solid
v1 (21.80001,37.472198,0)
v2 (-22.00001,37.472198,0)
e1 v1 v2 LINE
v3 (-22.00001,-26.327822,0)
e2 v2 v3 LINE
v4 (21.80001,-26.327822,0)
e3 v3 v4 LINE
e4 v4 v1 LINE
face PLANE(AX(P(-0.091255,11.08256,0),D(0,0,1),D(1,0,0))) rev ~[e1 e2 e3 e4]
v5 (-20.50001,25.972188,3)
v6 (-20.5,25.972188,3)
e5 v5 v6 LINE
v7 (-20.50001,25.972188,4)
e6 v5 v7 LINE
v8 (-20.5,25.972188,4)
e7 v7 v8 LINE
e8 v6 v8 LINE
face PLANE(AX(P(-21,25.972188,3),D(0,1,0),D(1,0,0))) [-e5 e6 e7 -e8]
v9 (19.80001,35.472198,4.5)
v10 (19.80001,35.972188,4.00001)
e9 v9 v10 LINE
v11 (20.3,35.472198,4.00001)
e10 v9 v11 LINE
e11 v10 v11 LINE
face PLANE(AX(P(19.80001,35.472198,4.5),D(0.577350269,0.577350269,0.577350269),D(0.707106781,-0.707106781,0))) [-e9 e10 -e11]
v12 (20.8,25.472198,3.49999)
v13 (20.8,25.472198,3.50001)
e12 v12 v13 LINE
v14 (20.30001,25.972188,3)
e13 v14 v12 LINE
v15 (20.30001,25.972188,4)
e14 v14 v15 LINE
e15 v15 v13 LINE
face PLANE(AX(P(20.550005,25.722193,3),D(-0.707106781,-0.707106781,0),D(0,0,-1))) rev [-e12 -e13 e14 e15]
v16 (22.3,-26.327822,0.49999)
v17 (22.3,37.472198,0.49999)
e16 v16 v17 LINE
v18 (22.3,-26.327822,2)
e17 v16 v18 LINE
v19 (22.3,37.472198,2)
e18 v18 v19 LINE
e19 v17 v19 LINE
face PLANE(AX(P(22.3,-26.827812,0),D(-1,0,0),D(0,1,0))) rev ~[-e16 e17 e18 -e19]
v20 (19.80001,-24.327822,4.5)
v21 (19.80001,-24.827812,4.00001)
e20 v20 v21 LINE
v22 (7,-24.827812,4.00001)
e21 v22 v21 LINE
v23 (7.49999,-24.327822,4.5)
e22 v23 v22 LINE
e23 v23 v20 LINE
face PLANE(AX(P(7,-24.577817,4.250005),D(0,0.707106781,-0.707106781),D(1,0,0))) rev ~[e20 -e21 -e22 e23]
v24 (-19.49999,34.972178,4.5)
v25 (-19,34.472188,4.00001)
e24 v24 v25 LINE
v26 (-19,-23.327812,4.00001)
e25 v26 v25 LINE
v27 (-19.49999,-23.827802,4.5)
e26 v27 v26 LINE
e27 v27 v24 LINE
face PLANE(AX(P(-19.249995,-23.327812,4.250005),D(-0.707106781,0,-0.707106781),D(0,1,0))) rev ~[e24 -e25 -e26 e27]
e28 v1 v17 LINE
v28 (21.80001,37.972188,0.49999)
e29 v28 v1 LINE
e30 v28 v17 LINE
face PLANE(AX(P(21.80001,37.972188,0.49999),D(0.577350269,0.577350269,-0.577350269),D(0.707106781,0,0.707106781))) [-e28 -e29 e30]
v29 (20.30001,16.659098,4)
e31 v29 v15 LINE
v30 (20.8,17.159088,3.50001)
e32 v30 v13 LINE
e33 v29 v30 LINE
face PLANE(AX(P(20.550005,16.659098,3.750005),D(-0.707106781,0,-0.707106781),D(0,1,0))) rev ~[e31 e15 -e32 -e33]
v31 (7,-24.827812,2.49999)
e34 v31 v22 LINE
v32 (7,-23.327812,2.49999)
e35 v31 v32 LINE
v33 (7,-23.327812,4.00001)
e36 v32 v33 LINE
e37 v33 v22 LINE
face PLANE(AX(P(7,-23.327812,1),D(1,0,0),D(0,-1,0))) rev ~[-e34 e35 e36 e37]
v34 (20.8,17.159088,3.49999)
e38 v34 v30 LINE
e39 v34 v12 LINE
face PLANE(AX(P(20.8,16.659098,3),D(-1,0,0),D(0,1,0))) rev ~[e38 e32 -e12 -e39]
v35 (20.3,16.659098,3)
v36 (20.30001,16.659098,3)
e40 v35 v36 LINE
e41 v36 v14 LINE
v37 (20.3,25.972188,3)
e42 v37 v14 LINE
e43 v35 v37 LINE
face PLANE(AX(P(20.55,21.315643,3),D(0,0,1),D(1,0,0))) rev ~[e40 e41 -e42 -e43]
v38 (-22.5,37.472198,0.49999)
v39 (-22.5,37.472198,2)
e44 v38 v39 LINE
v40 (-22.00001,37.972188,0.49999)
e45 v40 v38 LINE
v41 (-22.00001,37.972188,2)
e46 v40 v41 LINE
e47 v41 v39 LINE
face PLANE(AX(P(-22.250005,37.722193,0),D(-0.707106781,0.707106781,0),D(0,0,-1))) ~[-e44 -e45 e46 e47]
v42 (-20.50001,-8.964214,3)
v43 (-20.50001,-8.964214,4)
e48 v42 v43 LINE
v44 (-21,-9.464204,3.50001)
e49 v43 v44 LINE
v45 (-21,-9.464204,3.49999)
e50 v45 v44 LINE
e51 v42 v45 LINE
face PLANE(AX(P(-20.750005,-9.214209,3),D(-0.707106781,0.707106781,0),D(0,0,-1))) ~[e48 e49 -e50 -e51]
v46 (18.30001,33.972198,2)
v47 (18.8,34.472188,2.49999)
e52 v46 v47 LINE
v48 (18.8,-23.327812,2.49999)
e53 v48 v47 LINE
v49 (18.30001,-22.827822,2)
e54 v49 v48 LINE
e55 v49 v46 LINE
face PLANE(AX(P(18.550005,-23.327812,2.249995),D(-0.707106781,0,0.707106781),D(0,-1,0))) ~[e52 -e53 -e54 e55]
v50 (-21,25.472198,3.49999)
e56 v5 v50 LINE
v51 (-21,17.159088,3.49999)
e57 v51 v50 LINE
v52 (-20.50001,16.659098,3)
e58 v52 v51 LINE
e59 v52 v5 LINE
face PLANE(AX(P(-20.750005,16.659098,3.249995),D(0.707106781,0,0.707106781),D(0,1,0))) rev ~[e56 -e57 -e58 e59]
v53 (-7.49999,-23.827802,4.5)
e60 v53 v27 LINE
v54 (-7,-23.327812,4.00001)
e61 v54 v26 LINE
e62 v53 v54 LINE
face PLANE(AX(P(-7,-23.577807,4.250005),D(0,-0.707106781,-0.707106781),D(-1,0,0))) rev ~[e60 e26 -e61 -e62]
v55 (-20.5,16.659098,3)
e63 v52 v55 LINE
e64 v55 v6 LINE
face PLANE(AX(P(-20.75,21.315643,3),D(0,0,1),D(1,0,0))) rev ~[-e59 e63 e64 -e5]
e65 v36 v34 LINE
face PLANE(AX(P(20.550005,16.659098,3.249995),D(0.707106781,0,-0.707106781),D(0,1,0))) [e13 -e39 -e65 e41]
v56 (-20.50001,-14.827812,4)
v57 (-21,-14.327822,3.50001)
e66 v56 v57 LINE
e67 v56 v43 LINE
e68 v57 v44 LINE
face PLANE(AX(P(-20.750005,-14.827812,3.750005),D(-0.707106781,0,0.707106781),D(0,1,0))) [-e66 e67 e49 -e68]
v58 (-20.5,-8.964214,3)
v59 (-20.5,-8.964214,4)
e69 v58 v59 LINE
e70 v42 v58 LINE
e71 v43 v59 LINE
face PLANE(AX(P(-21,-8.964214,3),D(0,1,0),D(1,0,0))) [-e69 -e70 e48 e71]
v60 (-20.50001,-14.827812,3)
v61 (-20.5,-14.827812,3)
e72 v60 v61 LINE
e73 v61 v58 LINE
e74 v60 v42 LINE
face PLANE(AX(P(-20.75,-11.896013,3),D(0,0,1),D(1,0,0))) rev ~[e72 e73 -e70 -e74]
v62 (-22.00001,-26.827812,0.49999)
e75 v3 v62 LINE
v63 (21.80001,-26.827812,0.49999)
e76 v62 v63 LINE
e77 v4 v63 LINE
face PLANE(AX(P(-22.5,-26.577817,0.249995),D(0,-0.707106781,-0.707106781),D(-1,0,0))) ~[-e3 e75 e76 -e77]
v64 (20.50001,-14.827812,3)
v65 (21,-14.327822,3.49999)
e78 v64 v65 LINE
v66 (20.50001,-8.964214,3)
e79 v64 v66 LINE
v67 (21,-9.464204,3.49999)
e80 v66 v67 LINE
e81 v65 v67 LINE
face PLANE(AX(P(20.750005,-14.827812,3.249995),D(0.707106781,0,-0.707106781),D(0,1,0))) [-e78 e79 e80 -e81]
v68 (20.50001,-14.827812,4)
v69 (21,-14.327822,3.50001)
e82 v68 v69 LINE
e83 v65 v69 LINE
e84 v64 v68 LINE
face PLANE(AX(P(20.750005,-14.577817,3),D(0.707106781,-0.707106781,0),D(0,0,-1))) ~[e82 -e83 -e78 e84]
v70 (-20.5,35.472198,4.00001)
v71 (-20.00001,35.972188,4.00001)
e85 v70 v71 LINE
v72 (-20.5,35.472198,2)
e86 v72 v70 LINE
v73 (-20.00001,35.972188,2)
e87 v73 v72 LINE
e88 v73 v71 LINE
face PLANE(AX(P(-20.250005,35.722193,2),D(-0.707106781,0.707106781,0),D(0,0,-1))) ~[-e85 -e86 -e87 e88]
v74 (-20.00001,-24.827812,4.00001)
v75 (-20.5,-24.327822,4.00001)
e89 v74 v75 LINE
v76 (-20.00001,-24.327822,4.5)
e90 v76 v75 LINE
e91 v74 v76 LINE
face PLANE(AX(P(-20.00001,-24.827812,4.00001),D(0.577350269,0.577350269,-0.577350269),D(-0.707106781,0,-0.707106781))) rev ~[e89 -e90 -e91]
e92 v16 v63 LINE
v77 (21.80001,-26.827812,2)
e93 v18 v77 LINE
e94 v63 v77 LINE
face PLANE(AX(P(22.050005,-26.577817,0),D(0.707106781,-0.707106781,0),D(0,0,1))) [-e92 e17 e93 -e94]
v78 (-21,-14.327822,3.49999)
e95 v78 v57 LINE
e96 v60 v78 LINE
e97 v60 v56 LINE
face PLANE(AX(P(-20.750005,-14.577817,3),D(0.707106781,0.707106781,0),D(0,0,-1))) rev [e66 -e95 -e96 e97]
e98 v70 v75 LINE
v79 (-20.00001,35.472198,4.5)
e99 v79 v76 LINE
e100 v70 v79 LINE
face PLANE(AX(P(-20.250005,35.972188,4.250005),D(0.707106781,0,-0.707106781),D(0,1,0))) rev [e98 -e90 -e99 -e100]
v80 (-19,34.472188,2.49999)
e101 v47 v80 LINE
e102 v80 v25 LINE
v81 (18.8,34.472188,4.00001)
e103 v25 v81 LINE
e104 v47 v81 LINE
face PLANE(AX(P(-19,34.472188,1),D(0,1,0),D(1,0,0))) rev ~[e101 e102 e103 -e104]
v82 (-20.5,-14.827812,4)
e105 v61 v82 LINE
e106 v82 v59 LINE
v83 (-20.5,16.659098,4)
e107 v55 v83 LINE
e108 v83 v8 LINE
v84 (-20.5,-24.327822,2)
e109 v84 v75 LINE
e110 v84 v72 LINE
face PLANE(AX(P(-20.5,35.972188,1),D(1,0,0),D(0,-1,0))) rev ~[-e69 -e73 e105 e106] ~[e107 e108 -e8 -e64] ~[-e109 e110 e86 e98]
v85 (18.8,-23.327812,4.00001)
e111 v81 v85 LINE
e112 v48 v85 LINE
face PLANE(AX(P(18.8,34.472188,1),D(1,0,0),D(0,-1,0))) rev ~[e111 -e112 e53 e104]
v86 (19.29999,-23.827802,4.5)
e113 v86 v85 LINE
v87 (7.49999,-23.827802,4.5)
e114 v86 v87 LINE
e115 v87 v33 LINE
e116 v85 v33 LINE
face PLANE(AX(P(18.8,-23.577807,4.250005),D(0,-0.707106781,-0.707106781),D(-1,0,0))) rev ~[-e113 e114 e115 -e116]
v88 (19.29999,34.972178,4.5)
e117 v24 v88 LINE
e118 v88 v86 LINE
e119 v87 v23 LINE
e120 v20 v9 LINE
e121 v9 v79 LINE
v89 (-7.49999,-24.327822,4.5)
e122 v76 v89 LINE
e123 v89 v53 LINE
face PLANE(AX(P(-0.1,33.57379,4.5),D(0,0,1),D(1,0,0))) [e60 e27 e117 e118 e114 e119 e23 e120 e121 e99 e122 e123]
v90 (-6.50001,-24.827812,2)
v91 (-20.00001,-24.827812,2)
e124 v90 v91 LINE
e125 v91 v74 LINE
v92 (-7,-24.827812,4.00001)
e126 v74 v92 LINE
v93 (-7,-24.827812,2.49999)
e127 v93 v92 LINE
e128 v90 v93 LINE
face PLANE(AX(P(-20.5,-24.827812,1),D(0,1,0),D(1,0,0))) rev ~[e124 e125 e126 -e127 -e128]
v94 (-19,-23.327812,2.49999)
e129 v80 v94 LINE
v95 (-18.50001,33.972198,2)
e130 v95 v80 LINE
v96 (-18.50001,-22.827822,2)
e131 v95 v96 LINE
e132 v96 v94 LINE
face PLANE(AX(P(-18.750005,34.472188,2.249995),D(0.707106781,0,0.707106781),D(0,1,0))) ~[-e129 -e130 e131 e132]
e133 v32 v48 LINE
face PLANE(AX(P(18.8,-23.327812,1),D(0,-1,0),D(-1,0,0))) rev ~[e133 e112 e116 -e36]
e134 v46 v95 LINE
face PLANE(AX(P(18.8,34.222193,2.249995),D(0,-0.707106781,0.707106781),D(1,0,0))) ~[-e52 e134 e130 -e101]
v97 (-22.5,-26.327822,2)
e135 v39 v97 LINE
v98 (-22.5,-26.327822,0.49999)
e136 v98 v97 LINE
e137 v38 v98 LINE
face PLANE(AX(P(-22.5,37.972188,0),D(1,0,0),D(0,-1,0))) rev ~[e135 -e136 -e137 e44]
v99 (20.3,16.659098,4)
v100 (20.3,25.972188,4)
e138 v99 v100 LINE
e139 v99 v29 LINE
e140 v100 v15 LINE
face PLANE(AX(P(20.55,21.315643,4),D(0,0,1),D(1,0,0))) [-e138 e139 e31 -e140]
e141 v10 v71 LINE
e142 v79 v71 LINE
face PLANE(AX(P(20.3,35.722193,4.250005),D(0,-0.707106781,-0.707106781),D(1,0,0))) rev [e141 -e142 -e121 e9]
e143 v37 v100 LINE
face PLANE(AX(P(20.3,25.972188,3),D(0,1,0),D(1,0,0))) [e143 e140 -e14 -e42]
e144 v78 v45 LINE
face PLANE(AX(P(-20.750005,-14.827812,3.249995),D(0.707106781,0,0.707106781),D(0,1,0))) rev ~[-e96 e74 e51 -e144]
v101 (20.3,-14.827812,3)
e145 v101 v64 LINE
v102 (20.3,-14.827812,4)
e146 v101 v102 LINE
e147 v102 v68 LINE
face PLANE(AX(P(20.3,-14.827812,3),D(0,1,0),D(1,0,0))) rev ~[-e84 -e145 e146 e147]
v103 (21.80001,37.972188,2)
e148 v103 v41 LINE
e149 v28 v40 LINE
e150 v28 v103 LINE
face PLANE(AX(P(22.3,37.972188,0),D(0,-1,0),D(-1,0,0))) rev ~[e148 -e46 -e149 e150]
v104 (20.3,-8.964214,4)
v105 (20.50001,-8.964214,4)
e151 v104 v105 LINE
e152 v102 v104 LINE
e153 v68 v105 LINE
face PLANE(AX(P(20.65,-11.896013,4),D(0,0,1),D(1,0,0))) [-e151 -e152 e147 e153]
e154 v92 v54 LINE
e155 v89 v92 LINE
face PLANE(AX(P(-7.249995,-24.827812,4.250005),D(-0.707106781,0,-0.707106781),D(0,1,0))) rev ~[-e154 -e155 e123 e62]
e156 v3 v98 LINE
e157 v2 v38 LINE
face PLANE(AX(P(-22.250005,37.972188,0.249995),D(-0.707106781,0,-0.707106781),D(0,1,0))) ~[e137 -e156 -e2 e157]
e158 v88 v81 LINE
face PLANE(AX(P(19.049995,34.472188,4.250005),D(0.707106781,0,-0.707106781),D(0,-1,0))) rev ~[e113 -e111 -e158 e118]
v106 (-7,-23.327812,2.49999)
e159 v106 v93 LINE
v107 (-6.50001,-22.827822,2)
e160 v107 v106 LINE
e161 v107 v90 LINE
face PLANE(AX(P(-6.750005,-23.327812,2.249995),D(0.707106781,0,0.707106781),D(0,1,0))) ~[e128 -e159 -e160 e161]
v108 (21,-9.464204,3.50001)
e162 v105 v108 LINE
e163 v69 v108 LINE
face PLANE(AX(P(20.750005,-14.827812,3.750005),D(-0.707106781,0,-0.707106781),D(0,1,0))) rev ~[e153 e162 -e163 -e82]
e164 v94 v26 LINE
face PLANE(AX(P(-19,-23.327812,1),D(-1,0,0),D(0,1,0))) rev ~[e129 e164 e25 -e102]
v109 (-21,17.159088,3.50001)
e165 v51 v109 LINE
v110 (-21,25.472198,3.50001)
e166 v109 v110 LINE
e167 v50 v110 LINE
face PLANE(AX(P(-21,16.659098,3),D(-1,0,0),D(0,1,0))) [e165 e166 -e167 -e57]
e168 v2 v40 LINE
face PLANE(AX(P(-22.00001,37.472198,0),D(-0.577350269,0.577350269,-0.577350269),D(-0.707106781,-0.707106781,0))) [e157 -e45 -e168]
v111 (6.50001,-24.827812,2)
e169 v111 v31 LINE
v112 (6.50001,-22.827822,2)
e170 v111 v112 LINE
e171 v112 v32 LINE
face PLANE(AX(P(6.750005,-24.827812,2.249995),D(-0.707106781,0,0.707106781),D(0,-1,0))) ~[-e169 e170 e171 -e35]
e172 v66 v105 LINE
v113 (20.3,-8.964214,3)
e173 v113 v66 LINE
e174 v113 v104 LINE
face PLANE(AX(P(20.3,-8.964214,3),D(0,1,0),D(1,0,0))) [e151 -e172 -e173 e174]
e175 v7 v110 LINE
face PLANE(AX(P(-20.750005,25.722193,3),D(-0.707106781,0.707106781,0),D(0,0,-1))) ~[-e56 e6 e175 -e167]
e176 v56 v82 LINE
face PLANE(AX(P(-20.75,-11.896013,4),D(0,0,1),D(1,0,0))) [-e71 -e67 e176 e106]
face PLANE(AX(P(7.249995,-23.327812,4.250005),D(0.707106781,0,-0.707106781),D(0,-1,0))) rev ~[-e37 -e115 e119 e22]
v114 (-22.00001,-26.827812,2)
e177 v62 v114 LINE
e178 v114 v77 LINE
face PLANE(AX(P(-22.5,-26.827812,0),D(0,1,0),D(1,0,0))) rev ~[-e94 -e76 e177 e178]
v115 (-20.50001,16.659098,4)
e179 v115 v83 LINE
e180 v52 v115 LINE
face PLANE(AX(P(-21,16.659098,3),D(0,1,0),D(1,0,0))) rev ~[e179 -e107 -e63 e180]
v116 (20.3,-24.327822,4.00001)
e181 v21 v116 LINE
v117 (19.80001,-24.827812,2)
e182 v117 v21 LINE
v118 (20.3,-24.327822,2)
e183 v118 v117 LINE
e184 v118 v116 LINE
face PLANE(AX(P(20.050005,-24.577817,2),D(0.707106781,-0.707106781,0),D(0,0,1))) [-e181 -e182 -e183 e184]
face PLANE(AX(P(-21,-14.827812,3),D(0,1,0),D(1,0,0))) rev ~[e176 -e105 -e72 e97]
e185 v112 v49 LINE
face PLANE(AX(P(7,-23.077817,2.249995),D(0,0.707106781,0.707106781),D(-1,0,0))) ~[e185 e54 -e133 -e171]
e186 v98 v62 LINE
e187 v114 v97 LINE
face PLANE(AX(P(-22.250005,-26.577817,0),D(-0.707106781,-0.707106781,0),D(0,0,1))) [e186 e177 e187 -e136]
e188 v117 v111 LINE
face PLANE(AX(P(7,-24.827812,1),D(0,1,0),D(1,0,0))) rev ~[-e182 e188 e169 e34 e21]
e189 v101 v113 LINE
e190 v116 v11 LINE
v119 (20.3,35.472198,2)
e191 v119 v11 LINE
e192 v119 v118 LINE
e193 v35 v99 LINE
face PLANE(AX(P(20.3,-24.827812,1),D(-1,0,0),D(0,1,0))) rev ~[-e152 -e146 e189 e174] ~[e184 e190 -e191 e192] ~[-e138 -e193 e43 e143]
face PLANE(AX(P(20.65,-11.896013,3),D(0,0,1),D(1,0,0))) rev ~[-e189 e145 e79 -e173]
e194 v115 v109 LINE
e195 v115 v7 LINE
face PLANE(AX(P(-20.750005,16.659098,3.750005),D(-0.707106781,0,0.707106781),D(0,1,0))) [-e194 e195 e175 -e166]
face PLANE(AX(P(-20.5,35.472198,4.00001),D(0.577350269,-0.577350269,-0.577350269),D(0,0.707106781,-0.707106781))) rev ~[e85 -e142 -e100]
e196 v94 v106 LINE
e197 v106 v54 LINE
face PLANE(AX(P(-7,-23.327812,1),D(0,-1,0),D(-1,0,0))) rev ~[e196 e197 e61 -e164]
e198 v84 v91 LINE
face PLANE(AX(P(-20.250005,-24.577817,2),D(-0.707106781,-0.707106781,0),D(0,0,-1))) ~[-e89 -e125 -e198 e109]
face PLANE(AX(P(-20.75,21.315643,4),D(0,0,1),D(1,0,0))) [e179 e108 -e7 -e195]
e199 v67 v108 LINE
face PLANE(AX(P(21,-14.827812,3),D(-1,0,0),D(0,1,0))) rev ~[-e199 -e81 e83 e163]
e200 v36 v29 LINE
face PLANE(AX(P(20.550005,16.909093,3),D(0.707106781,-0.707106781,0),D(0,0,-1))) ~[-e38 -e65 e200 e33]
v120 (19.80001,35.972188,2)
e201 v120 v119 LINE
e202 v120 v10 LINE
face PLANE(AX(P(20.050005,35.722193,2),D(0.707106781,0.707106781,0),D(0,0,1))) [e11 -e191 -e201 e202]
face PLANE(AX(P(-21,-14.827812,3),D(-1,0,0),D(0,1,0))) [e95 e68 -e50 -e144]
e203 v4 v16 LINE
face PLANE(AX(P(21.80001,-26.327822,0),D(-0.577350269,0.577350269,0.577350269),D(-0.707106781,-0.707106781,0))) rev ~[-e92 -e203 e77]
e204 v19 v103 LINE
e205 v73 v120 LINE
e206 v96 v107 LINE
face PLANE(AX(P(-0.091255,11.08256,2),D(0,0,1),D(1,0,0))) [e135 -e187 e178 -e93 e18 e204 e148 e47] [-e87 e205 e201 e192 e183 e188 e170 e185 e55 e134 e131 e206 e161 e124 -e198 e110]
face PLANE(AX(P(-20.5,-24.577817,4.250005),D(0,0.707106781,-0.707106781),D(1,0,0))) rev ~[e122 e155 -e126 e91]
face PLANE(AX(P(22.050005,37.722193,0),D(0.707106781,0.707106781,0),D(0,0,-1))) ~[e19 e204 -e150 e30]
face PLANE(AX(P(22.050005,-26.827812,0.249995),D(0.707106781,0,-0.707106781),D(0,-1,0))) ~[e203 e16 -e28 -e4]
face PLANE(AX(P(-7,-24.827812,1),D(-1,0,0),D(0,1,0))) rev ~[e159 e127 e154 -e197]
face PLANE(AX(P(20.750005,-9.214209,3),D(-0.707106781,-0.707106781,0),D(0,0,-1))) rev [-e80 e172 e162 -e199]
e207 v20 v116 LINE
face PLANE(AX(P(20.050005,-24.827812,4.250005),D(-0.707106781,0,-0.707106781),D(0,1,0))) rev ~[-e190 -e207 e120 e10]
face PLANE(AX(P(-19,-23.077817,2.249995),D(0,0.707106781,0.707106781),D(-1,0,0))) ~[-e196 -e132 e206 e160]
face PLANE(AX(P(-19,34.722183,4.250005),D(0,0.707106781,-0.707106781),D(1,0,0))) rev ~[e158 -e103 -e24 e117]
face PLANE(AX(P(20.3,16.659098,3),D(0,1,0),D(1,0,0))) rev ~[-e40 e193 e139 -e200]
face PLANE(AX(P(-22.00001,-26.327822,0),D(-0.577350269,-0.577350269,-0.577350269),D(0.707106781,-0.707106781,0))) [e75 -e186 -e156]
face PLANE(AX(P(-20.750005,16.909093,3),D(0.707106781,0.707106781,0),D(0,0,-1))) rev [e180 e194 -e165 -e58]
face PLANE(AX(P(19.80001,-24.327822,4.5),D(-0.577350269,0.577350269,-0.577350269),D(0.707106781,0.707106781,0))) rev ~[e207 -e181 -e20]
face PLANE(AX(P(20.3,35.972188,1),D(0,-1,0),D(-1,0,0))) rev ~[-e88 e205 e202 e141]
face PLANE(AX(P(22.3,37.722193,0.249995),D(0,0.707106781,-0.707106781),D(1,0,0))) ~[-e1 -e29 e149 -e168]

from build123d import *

# Parameters (mm, degrees)
F0_W     = 1.5
F0_H     = 9.3130898729
F0_H_2   = 25.6233112887
F0_H_3   = 5.8635988384
F0_W_2   = 14
F0_H_4   = 2
F0_H_5   = 0.4158456028
F0_W_3   = 0.7
F0_W_4   = 0.5
F0_W_5   = 37.8
F0_H_6   = 8.5
F0_W_6   = 10
F0_H_7   = 1.5
F1_DEPTH = 2
F2_START = 1
F2_DEPTH = 3.5
F3_START = 3
F3_DEPTH = 1
F4_SIZE  = 0.49999


# Not quite as in the source:
# - a fillet or chamfer is up to 0.001 mm smaller than in the source, because OpenCascade refuses the exact size
# - a feature names something its author has since deleted; it is built from what else it names


with BuildPart() as f1:
    # F0 (on Top) → F1 (new body)
    with BuildSketch(Plane.XY):
        Polygon((-20.5, 25.9721875068), (-20.5, 35.9721875068), (20.3, 35.9721875068), (20.3, 25.9721875068), (20.8, 25.9721875068), (20.8, 16.6590976339), (20.3, 16.6590976339), (20.3, -8.9642136547), (21, -8.9642136547), (21, -14.8278124932), (20.3, -14.8278124932), (20.3, -24.8278124932), (17, -24.8278124932), (17, -26.8278124932), (22.3, -26.8278124932), (22.3, -13.9410611472), (22.3, 25.0854361609), (22.3, 37.9721875068), (-22.5, 37.9721875068), (-22.5, 25.0854361609), (-22.5, -13.9410611472), (-22.5, -26.8278124932), (-17, -26.8278124932), (-17, -24.8278124932), (-20.5, -24.8278124932), (-20.5, -14.8278124932), (-21, -14.8278124932), (-21, -8.9642136547), (-20.5, -8.9642136547), (-20.5, 16.6590976339), (-21, 16.6590976339), (-21, 25.9721875068), align=None)
        Polygon((20.3, 35.9721875068), (-20.5, 35.9721875068), (-20.5, 25.9721875068), (-19, 25.9721875068), (-19, 34.4721875068), (18.8, 34.4721875068), (18.8, 25.9721875068), (20.3, 25.9721875068), align=None)
        with Locations((-19.75, 21.3156425704)):
            Rectangle(F0_W, F0_H)
        with Locations((-19.75, 3.8474419896)):
            Rectangle(F0_W, F0_H_2)
        Polygon((18.8, -14.8278124932), (-19, -14.8278124932), (-19, -23.3278124932), (-7, -23.3278124932), (-7, -22.9119668904), (7, -22.9119668904), (7, -23.3278124932), (18.8, -23.3278124932), align=None)
        with Locations((-19.75, -11.8960130739)):
            Rectangle(F0_W, F0_H_3)
        with Locations((0, -25.8278124932)):
            Rectangle(F0_W_2, F0_H_4)
        with Locations((0, -23.1198896918)):
            Rectangle(F0_W_2, F0_H_5)
        Polygon((-19, -14.8278124932), (-20.5, -14.8278124932), (-20.5, -24.8278124932), (-17, -24.8278124932), (-7, -24.8278124932), (-7, -23.3278124932), (-19, -23.3278124932), align=None)
        with Locations((20.65, -11.8960130739)):
            Rectangle(F0_W_3, F0_H_3)
        with Locations((-20.75, -11.8960130739)):
            Rectangle(F0_W_4, F0_H_3)
        with Locations((-20.75, 21.3156425704)):
            Rectangle(F0_W_4, F0_H)
        with Locations((20.55, 21.3156425704)):
            Rectangle(F0_W_4, F0_H)
        with Locations((-0.1, 30.2221875068)):
            Rectangle(F0_W_5, F0_H_6)
        with Locations((-0.1, 21.3156425704)):
            Rectangle(F0_W_5, F0_H)
        with Locations((-0.1, 3.8474419896)):
            Rectangle(F0_W_5, F0_H_2)
        with Locations((-0.1, -11.8960130739)):
            Rectangle(F0_W_5, F0_H_3)
        with Locations((-12, -25.8278124932)):
            Rectangle(F0_W_6, F0_H_4)
        with Locations((0, -24.0778124932)):
            Rectangle(F0_W_2, F0_H_7)
        Polygon((20.3, -24.8278124932), (20.3, -14.8278124932), (18.8, -14.8278124932), (18.8, -23.3278124932), (7, -23.3278124932), (7, -24.8278124932), (17, -24.8278124932), align=None)
        with Locations((12, -25.8278124932)):
            Rectangle(F0_W_6, F0_H_4)
        with Locations((19.55, -11.8960130739)):
            Rectangle(F0_W, F0_H_3)
        with Locations((19.55, 3.8474419896)):
            Rectangle(F0_W, F0_H_2)
        with Locations((19.55, 21.3156425704)):
            Rectangle(F0_W, F0_H)
    extrude(amount=F1_DEPTH)

    # F0 (on Top) → F2 (join)
    with BuildSketch(Plane.XY.offset(F2_START)):
        Polygon((20.3, 35.9721875068), (-20.5, 35.9721875068), (-20.5, 25.9721875068), (-19, 25.9721875068), (-19, 34.4721875068), (18.8, 34.4721875068), (18.8, 25.9721875068), (20.3, 25.9721875068), align=None)
        with Locations((-19.75, 21.3156425704)):
            Rectangle(F0_W, F0_H)
        with Locations((-19.75, 3.8474419896)):
            Rectangle(F0_W, F0_H_2)
        with Locations((19.55, 21.3156425704)):
            Rectangle(F0_W, F0_H)
        with Locations((19.55, 3.8474419896)):
            Rectangle(F0_W, F0_H_2)
        Polygon((20.3, -24.8278124932), (20.3, -14.8278124932), (18.8, -14.8278124932), (18.8, -23.3278124932), (7, -23.3278124932), (7, -24.8278124932), (17, -24.8278124932), align=None)
        with Locations((19.55, -11.8960130739)):
            Rectangle(F0_W, F0_H_3)
        Polygon((-19, -14.8278124932), (-20.5, -14.8278124932), (-20.5, -24.8278124932), (-17, -24.8278124932), (-7, -24.8278124932), (-7, -23.3278124932), (-19, -23.3278124932), align=None)
        with Locations((-19.75, -11.8960130739)):
            Rectangle(F0_W, F0_H_3)
    extrude(amount=F2_DEPTH)

    # F0 (on Top) → F3 (join)
    with BuildSketch(Plane.XY.offset(F3_START)):
        with Locations((20.55, 21.3156425704)):
            Rectangle(F0_W_4, F0_H)
        with Locations((-20.75, 21.3156425704)):
            Rectangle(F0_W_4, F0_H)
        with Locations((-20.75, -11.8960130739)):
            Rectangle(F0_W_4, F0_H_3)
        with Locations((20.65, -11.8960130739)):
            Rectangle(F0_W_3, F0_H_3)
    extrude(amount=F3_DEPTH)

    # F4 (size 0.5 in the source; OpenCascade refuses exactly that, so slightly less here)
    f4_edges = [f1.edges().sort_by_distance(p)[0] for p in [
        (-21, 25.972188, 3.5),
        (-21, 16.659098, 3.5),
        (-21, 21.315643, 3),
        (-21, 21.315643, 4),
        (-21, -8.964214, 3.5),
        (-21, -14.827812, 3.5),
        (-21, -11.896013, 3),
        (-21, -11.896013, 4),
        (20.8, 16.659098, 3.5),
        (20.8, 25.972188, 3.5),
        (20.8, 21.315643, 3),
        (20.8, 21.315643, 4),
        (21, -14.827812, 3.5),
        (21, -8.964214, 3.5),
        (21, -11.896013, 3),
        (21, -11.896013, 4),
        (20.3, -24.827812, 3.25),
        (20.3, 35.972188, 3.25),
        (-0.1, 35.972188, 4.5),
        (-20.5, 5.572188, 4.5),
        (-13.75, -24.827812, 4.5),
        (-7, -24.077812, 4.5),
        (-13, -23.327812, 4.5),
        (-19, 5.572188, 4.5),
        (-0.1, 34.472188, 4.5),
        (18.8, 5.572188, 4.5),
        (12.9, -23.327812, 4.5),
        (7, -24.077812, 4.5),
        (13.65, -24.827812, 4.5),
        (20.3, 5.572188, 4.5),
        (-20.5, 35.972188, 3.25),
        (-22.5, 37.972188, 1),
        (-20.5, -24.827812, 3.25),
        (-22.5, -26.827812, 1),
        (22.3, -26.827812, 1),
        (22.3, 5.572188, 0),
        (-0.1, 37.972188, 0),
        (-22.5, 5.572188, 0),
        (-0.1, -26.827812, 0),
        (12.9, -23.327812, 2),
        (18.8, 5.572188, 2),
        (-13, -23.327812, 2),
        (-19, 5.572188, 2),
        (-0.1, 34.472188, 2),
        (7, -24.077812, 2),
        (-7, -24.077812, 2),
        (22.3, 37.972188, 1),
    ]]
    chamfer(f4_edges, length=F4_SIZE)


solid = f1.part
